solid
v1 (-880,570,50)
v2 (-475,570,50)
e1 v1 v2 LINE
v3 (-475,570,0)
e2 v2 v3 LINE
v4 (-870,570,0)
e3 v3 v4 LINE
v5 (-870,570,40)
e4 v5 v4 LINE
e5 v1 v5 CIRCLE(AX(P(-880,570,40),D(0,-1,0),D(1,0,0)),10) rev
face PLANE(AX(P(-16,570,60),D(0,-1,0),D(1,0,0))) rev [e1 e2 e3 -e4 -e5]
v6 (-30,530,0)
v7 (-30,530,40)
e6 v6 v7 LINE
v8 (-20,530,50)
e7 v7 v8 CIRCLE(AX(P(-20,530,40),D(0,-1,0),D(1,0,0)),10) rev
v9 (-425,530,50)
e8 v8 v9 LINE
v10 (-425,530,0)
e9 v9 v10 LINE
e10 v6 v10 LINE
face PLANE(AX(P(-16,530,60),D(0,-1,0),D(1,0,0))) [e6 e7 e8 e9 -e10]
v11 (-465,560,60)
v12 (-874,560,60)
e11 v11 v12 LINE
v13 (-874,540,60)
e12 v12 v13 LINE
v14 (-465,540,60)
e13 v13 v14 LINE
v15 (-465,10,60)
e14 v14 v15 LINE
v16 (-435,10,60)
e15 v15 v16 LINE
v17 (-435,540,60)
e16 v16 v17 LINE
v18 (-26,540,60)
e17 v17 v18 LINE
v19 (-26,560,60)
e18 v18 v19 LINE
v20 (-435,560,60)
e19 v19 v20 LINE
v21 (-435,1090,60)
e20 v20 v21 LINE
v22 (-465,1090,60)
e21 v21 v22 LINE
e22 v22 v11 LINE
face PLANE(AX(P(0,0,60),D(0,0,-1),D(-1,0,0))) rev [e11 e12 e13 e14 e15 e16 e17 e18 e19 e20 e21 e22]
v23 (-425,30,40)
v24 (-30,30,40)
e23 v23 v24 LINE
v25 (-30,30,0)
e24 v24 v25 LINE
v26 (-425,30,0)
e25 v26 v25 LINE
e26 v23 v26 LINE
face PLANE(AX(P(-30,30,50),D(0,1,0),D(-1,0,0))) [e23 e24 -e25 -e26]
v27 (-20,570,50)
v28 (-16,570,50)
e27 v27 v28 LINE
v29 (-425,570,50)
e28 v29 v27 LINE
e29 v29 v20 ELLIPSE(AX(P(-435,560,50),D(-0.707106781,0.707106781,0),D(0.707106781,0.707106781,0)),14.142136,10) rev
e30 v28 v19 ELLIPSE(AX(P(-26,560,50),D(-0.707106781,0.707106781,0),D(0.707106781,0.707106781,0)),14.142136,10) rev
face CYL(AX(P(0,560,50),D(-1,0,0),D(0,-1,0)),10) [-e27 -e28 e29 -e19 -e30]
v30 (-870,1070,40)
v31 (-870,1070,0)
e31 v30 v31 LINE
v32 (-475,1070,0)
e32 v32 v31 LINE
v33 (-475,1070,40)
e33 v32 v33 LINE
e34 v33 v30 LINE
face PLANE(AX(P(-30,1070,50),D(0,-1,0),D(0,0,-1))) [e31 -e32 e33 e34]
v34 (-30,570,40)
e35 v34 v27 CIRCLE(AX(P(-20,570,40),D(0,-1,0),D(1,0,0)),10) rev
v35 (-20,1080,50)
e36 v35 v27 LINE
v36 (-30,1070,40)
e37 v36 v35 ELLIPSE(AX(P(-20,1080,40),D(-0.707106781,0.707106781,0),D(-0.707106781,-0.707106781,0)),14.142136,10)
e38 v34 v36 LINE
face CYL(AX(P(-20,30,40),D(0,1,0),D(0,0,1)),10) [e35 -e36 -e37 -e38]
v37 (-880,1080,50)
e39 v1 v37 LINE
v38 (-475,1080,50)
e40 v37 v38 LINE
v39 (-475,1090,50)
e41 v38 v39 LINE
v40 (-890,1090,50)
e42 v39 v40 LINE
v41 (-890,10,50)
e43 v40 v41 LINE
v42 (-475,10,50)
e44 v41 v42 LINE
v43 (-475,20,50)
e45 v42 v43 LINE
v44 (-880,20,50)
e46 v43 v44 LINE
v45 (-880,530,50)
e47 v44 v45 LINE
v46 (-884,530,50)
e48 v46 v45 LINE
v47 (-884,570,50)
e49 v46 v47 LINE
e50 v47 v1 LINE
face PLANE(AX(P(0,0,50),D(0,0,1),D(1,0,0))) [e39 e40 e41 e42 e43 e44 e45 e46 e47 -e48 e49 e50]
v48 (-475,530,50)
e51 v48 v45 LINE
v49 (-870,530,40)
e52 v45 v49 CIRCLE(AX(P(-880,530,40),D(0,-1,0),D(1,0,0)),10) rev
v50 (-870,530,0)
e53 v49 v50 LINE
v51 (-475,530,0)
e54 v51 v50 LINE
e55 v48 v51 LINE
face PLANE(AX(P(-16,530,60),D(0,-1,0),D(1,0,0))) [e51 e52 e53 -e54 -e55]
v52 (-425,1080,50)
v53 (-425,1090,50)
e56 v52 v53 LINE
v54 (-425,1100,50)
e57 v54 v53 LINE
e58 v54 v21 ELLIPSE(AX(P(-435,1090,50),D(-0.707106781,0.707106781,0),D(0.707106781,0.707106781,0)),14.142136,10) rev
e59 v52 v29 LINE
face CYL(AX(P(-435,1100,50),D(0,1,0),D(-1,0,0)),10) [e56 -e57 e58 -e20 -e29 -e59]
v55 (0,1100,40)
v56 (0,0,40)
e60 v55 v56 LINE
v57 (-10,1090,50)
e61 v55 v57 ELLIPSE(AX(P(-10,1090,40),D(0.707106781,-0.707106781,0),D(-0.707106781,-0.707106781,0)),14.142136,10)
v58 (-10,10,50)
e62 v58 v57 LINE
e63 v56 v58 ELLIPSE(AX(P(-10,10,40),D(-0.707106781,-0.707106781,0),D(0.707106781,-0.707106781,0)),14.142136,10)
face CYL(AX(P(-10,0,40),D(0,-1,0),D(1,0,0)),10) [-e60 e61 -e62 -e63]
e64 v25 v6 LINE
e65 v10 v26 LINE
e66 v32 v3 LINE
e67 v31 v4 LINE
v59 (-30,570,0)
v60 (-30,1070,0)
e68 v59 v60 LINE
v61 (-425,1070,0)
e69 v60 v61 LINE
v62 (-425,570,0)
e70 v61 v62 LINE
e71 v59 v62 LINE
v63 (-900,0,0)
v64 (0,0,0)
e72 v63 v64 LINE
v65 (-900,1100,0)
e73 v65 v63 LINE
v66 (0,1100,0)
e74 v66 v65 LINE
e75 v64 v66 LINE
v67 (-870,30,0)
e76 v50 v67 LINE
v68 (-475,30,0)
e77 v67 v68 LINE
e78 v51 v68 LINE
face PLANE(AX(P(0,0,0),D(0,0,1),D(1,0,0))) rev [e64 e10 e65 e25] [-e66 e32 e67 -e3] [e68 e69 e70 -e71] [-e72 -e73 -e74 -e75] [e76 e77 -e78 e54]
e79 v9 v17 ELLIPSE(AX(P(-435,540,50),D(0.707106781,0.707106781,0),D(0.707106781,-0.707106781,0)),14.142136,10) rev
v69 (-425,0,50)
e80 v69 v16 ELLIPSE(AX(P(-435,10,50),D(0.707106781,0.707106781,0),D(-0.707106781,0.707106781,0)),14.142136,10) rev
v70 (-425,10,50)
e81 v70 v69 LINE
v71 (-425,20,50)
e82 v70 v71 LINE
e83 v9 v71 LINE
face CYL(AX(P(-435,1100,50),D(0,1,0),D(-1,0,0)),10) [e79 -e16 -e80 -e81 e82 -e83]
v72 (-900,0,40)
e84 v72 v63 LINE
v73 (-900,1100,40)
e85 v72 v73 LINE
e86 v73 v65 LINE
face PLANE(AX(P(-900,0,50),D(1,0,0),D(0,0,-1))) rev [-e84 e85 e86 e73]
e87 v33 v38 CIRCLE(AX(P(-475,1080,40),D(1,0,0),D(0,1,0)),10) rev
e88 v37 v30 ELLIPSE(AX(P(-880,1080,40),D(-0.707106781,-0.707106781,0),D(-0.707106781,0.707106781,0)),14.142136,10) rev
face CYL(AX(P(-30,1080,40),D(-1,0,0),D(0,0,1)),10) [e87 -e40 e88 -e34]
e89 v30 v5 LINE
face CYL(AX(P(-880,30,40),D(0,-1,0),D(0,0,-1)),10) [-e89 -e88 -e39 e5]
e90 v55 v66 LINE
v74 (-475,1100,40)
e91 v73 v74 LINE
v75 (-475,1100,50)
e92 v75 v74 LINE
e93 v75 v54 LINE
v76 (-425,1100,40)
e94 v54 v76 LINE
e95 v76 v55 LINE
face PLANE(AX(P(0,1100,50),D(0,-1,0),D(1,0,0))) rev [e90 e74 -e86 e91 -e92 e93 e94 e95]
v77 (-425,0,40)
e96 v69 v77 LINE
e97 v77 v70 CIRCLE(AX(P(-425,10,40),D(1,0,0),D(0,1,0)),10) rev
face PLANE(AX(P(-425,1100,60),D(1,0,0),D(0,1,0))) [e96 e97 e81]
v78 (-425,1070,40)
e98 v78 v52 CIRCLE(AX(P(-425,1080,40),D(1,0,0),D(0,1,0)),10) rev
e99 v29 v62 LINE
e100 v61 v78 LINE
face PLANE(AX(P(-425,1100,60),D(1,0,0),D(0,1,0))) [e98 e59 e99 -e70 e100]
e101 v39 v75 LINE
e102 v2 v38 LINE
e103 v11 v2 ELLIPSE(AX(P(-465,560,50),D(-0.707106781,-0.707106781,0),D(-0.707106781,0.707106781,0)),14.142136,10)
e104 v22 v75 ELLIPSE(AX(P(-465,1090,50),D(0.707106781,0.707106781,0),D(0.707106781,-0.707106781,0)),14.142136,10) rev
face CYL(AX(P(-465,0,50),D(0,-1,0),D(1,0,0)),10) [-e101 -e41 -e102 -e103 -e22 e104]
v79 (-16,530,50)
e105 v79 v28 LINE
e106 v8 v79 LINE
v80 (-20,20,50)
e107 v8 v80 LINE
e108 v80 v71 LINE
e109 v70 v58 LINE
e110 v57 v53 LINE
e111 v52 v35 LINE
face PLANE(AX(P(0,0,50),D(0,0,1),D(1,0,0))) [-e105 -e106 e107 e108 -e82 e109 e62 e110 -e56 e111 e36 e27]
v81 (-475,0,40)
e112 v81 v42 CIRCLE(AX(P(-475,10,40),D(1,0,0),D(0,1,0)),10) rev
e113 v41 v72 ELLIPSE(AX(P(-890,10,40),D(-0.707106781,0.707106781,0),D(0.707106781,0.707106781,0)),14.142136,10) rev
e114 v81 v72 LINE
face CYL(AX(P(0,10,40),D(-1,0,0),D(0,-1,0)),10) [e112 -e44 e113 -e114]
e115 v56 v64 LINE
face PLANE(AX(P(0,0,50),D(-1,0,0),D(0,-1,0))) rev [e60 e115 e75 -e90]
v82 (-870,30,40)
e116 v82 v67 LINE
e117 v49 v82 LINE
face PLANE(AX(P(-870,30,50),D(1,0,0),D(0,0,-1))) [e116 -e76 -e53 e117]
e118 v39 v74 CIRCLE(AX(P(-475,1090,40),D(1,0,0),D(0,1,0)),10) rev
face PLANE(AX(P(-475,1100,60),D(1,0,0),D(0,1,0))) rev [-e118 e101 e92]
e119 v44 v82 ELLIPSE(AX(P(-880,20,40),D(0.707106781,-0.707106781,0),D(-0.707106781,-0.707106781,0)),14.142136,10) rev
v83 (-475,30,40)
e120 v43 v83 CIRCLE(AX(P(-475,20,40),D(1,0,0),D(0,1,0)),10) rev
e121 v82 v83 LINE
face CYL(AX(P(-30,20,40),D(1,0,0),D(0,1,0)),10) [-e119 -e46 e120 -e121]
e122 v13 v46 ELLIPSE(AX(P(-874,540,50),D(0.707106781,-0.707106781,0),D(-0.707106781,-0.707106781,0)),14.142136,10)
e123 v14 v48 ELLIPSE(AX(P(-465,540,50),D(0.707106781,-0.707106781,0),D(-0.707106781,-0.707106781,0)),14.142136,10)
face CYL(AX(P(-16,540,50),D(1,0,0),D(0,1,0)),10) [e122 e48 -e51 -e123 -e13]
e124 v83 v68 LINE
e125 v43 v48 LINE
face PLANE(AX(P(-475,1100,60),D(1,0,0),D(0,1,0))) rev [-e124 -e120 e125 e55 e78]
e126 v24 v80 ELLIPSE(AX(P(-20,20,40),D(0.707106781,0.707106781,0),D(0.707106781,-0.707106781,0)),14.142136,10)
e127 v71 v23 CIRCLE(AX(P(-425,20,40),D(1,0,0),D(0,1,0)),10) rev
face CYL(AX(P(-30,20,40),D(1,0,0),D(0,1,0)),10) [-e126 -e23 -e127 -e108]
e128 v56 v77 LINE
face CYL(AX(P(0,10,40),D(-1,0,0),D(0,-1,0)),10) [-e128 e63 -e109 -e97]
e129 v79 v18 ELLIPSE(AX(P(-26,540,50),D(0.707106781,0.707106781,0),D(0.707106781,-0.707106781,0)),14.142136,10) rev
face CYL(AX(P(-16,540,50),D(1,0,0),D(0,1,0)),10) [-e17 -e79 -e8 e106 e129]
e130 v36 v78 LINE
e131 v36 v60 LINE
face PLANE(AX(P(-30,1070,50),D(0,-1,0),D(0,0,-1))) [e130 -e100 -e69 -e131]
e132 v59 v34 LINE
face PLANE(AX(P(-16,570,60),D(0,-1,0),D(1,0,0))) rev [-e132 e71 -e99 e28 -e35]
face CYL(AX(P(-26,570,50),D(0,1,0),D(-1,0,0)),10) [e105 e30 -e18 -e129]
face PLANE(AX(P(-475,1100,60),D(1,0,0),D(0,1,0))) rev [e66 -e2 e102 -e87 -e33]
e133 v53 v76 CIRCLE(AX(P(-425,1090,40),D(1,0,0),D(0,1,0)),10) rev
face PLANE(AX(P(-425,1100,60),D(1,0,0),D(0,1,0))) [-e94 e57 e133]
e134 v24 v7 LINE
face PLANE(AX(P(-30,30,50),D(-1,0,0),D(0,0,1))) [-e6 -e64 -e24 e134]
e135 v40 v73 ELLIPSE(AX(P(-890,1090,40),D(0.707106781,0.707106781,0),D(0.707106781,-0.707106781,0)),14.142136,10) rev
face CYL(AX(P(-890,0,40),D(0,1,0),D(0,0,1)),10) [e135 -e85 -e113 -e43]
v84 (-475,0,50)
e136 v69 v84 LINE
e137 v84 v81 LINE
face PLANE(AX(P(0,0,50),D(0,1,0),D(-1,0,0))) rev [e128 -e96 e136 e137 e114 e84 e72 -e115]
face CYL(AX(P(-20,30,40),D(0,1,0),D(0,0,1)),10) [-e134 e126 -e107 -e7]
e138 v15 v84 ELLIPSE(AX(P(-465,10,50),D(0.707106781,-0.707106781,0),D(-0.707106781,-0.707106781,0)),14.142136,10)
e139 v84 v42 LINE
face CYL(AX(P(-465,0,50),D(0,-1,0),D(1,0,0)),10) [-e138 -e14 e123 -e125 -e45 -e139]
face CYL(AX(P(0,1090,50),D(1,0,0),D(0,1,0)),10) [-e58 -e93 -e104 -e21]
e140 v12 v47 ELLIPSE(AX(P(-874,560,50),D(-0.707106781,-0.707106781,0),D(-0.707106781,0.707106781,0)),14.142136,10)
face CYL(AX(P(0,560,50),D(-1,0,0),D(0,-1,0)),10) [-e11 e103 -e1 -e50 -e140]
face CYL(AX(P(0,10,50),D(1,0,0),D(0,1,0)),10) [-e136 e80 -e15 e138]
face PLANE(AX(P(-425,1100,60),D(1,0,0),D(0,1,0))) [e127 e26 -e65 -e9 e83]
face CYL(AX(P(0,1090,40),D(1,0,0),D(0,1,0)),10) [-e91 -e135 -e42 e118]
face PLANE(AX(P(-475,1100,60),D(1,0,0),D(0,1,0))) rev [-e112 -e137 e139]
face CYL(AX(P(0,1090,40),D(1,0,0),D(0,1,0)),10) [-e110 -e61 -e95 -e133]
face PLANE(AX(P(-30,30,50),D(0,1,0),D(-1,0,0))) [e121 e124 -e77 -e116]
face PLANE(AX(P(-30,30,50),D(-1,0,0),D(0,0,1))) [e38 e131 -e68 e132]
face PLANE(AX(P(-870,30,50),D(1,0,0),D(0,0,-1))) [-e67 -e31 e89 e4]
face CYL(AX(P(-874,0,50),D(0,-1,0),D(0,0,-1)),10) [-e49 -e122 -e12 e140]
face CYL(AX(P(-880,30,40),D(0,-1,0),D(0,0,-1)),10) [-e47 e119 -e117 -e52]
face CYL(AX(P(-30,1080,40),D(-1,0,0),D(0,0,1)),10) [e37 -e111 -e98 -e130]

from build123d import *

# Parameters (mm, degrees)
SKETCH1_W           = 900
SKETCH1_H           = 1100
SKETCH1_W_2         = 840
SKETCH1_H_2         = 1040
BOSS_EXTRUDE1_DEPTH = 50
FILLET1_R           = 10
SKETCH2_W           = 50
SKETCH2_H           = 1100
SKETCH2_W_2         = 868
SKETCH2_H_2         = 40
BOSS_EXTRUDE2_DEPTH = 60
FILLET2_R           = 10


with BuildPart() as part:
    # Sketch1 → Boss-Extrude1 (new body)
    with BuildSketch(Plane.XY):
        with Locations((-450, 550)):
            Rectangle(SKETCH1_W, SKETCH1_H)
        with Locations((-450, 550)):
            Rectangle(SKETCH1_W_2, SKETCH1_H_2, mode=Mode.SUBTRACT)
    extrude(amount=BOSS_EXTRUDE1_DEPTH)

    # Fillet1
    fillet1_edges = [part.edges().sort_by_distance(p)[0] for p in [
        (-900, 550, 50),
        (-450, 0, 50),
        (-450, 30, 50),
        (-30, 550, 50),
        (-450, 1070, 50),
        (-870, 550, 50),
        (0, 550, 50),
        (-450, 1100, 50),
    ]]
    fillet(fillet1_edges, radius=FILLET1_R)

    # Sketch2 → Boss-Extrude2 (add)
    with BuildSketch(Plane.XY):
        with Locations((-450, 550)):
            Rectangle(SKETCH2_W, SKETCH2_H)
        with Locations((-450, 550)):
            Rectangle(SKETCH2_W_2, SKETCH2_H_2)
    extrude(amount=BOSS_EXTRUDE2_DEPTH)

    # Fillet2
    fillet2_edges = [part.edges().sort_by_distance(p)[0] for p in [
        (-450, 0, 60),
        (-475, 265, 60),
        (-679.5, 530, 60),
        (-884, 550, 60),
        (-679.5, 570, 60),
        (-475, 835, 60),
        (-450, 1100, 60),
        (-425, 835, 60),
        (-220.5, 570, 60),
        (-16, 550, 60),
        (-220.5, 530, 60),
        (-425, 265, 60),
    ]]
    fillet(fillet2_edges, radius=FILLET2_R - 0.0001)  # a hair under: the kernel refuses the full size


solid = part.part
